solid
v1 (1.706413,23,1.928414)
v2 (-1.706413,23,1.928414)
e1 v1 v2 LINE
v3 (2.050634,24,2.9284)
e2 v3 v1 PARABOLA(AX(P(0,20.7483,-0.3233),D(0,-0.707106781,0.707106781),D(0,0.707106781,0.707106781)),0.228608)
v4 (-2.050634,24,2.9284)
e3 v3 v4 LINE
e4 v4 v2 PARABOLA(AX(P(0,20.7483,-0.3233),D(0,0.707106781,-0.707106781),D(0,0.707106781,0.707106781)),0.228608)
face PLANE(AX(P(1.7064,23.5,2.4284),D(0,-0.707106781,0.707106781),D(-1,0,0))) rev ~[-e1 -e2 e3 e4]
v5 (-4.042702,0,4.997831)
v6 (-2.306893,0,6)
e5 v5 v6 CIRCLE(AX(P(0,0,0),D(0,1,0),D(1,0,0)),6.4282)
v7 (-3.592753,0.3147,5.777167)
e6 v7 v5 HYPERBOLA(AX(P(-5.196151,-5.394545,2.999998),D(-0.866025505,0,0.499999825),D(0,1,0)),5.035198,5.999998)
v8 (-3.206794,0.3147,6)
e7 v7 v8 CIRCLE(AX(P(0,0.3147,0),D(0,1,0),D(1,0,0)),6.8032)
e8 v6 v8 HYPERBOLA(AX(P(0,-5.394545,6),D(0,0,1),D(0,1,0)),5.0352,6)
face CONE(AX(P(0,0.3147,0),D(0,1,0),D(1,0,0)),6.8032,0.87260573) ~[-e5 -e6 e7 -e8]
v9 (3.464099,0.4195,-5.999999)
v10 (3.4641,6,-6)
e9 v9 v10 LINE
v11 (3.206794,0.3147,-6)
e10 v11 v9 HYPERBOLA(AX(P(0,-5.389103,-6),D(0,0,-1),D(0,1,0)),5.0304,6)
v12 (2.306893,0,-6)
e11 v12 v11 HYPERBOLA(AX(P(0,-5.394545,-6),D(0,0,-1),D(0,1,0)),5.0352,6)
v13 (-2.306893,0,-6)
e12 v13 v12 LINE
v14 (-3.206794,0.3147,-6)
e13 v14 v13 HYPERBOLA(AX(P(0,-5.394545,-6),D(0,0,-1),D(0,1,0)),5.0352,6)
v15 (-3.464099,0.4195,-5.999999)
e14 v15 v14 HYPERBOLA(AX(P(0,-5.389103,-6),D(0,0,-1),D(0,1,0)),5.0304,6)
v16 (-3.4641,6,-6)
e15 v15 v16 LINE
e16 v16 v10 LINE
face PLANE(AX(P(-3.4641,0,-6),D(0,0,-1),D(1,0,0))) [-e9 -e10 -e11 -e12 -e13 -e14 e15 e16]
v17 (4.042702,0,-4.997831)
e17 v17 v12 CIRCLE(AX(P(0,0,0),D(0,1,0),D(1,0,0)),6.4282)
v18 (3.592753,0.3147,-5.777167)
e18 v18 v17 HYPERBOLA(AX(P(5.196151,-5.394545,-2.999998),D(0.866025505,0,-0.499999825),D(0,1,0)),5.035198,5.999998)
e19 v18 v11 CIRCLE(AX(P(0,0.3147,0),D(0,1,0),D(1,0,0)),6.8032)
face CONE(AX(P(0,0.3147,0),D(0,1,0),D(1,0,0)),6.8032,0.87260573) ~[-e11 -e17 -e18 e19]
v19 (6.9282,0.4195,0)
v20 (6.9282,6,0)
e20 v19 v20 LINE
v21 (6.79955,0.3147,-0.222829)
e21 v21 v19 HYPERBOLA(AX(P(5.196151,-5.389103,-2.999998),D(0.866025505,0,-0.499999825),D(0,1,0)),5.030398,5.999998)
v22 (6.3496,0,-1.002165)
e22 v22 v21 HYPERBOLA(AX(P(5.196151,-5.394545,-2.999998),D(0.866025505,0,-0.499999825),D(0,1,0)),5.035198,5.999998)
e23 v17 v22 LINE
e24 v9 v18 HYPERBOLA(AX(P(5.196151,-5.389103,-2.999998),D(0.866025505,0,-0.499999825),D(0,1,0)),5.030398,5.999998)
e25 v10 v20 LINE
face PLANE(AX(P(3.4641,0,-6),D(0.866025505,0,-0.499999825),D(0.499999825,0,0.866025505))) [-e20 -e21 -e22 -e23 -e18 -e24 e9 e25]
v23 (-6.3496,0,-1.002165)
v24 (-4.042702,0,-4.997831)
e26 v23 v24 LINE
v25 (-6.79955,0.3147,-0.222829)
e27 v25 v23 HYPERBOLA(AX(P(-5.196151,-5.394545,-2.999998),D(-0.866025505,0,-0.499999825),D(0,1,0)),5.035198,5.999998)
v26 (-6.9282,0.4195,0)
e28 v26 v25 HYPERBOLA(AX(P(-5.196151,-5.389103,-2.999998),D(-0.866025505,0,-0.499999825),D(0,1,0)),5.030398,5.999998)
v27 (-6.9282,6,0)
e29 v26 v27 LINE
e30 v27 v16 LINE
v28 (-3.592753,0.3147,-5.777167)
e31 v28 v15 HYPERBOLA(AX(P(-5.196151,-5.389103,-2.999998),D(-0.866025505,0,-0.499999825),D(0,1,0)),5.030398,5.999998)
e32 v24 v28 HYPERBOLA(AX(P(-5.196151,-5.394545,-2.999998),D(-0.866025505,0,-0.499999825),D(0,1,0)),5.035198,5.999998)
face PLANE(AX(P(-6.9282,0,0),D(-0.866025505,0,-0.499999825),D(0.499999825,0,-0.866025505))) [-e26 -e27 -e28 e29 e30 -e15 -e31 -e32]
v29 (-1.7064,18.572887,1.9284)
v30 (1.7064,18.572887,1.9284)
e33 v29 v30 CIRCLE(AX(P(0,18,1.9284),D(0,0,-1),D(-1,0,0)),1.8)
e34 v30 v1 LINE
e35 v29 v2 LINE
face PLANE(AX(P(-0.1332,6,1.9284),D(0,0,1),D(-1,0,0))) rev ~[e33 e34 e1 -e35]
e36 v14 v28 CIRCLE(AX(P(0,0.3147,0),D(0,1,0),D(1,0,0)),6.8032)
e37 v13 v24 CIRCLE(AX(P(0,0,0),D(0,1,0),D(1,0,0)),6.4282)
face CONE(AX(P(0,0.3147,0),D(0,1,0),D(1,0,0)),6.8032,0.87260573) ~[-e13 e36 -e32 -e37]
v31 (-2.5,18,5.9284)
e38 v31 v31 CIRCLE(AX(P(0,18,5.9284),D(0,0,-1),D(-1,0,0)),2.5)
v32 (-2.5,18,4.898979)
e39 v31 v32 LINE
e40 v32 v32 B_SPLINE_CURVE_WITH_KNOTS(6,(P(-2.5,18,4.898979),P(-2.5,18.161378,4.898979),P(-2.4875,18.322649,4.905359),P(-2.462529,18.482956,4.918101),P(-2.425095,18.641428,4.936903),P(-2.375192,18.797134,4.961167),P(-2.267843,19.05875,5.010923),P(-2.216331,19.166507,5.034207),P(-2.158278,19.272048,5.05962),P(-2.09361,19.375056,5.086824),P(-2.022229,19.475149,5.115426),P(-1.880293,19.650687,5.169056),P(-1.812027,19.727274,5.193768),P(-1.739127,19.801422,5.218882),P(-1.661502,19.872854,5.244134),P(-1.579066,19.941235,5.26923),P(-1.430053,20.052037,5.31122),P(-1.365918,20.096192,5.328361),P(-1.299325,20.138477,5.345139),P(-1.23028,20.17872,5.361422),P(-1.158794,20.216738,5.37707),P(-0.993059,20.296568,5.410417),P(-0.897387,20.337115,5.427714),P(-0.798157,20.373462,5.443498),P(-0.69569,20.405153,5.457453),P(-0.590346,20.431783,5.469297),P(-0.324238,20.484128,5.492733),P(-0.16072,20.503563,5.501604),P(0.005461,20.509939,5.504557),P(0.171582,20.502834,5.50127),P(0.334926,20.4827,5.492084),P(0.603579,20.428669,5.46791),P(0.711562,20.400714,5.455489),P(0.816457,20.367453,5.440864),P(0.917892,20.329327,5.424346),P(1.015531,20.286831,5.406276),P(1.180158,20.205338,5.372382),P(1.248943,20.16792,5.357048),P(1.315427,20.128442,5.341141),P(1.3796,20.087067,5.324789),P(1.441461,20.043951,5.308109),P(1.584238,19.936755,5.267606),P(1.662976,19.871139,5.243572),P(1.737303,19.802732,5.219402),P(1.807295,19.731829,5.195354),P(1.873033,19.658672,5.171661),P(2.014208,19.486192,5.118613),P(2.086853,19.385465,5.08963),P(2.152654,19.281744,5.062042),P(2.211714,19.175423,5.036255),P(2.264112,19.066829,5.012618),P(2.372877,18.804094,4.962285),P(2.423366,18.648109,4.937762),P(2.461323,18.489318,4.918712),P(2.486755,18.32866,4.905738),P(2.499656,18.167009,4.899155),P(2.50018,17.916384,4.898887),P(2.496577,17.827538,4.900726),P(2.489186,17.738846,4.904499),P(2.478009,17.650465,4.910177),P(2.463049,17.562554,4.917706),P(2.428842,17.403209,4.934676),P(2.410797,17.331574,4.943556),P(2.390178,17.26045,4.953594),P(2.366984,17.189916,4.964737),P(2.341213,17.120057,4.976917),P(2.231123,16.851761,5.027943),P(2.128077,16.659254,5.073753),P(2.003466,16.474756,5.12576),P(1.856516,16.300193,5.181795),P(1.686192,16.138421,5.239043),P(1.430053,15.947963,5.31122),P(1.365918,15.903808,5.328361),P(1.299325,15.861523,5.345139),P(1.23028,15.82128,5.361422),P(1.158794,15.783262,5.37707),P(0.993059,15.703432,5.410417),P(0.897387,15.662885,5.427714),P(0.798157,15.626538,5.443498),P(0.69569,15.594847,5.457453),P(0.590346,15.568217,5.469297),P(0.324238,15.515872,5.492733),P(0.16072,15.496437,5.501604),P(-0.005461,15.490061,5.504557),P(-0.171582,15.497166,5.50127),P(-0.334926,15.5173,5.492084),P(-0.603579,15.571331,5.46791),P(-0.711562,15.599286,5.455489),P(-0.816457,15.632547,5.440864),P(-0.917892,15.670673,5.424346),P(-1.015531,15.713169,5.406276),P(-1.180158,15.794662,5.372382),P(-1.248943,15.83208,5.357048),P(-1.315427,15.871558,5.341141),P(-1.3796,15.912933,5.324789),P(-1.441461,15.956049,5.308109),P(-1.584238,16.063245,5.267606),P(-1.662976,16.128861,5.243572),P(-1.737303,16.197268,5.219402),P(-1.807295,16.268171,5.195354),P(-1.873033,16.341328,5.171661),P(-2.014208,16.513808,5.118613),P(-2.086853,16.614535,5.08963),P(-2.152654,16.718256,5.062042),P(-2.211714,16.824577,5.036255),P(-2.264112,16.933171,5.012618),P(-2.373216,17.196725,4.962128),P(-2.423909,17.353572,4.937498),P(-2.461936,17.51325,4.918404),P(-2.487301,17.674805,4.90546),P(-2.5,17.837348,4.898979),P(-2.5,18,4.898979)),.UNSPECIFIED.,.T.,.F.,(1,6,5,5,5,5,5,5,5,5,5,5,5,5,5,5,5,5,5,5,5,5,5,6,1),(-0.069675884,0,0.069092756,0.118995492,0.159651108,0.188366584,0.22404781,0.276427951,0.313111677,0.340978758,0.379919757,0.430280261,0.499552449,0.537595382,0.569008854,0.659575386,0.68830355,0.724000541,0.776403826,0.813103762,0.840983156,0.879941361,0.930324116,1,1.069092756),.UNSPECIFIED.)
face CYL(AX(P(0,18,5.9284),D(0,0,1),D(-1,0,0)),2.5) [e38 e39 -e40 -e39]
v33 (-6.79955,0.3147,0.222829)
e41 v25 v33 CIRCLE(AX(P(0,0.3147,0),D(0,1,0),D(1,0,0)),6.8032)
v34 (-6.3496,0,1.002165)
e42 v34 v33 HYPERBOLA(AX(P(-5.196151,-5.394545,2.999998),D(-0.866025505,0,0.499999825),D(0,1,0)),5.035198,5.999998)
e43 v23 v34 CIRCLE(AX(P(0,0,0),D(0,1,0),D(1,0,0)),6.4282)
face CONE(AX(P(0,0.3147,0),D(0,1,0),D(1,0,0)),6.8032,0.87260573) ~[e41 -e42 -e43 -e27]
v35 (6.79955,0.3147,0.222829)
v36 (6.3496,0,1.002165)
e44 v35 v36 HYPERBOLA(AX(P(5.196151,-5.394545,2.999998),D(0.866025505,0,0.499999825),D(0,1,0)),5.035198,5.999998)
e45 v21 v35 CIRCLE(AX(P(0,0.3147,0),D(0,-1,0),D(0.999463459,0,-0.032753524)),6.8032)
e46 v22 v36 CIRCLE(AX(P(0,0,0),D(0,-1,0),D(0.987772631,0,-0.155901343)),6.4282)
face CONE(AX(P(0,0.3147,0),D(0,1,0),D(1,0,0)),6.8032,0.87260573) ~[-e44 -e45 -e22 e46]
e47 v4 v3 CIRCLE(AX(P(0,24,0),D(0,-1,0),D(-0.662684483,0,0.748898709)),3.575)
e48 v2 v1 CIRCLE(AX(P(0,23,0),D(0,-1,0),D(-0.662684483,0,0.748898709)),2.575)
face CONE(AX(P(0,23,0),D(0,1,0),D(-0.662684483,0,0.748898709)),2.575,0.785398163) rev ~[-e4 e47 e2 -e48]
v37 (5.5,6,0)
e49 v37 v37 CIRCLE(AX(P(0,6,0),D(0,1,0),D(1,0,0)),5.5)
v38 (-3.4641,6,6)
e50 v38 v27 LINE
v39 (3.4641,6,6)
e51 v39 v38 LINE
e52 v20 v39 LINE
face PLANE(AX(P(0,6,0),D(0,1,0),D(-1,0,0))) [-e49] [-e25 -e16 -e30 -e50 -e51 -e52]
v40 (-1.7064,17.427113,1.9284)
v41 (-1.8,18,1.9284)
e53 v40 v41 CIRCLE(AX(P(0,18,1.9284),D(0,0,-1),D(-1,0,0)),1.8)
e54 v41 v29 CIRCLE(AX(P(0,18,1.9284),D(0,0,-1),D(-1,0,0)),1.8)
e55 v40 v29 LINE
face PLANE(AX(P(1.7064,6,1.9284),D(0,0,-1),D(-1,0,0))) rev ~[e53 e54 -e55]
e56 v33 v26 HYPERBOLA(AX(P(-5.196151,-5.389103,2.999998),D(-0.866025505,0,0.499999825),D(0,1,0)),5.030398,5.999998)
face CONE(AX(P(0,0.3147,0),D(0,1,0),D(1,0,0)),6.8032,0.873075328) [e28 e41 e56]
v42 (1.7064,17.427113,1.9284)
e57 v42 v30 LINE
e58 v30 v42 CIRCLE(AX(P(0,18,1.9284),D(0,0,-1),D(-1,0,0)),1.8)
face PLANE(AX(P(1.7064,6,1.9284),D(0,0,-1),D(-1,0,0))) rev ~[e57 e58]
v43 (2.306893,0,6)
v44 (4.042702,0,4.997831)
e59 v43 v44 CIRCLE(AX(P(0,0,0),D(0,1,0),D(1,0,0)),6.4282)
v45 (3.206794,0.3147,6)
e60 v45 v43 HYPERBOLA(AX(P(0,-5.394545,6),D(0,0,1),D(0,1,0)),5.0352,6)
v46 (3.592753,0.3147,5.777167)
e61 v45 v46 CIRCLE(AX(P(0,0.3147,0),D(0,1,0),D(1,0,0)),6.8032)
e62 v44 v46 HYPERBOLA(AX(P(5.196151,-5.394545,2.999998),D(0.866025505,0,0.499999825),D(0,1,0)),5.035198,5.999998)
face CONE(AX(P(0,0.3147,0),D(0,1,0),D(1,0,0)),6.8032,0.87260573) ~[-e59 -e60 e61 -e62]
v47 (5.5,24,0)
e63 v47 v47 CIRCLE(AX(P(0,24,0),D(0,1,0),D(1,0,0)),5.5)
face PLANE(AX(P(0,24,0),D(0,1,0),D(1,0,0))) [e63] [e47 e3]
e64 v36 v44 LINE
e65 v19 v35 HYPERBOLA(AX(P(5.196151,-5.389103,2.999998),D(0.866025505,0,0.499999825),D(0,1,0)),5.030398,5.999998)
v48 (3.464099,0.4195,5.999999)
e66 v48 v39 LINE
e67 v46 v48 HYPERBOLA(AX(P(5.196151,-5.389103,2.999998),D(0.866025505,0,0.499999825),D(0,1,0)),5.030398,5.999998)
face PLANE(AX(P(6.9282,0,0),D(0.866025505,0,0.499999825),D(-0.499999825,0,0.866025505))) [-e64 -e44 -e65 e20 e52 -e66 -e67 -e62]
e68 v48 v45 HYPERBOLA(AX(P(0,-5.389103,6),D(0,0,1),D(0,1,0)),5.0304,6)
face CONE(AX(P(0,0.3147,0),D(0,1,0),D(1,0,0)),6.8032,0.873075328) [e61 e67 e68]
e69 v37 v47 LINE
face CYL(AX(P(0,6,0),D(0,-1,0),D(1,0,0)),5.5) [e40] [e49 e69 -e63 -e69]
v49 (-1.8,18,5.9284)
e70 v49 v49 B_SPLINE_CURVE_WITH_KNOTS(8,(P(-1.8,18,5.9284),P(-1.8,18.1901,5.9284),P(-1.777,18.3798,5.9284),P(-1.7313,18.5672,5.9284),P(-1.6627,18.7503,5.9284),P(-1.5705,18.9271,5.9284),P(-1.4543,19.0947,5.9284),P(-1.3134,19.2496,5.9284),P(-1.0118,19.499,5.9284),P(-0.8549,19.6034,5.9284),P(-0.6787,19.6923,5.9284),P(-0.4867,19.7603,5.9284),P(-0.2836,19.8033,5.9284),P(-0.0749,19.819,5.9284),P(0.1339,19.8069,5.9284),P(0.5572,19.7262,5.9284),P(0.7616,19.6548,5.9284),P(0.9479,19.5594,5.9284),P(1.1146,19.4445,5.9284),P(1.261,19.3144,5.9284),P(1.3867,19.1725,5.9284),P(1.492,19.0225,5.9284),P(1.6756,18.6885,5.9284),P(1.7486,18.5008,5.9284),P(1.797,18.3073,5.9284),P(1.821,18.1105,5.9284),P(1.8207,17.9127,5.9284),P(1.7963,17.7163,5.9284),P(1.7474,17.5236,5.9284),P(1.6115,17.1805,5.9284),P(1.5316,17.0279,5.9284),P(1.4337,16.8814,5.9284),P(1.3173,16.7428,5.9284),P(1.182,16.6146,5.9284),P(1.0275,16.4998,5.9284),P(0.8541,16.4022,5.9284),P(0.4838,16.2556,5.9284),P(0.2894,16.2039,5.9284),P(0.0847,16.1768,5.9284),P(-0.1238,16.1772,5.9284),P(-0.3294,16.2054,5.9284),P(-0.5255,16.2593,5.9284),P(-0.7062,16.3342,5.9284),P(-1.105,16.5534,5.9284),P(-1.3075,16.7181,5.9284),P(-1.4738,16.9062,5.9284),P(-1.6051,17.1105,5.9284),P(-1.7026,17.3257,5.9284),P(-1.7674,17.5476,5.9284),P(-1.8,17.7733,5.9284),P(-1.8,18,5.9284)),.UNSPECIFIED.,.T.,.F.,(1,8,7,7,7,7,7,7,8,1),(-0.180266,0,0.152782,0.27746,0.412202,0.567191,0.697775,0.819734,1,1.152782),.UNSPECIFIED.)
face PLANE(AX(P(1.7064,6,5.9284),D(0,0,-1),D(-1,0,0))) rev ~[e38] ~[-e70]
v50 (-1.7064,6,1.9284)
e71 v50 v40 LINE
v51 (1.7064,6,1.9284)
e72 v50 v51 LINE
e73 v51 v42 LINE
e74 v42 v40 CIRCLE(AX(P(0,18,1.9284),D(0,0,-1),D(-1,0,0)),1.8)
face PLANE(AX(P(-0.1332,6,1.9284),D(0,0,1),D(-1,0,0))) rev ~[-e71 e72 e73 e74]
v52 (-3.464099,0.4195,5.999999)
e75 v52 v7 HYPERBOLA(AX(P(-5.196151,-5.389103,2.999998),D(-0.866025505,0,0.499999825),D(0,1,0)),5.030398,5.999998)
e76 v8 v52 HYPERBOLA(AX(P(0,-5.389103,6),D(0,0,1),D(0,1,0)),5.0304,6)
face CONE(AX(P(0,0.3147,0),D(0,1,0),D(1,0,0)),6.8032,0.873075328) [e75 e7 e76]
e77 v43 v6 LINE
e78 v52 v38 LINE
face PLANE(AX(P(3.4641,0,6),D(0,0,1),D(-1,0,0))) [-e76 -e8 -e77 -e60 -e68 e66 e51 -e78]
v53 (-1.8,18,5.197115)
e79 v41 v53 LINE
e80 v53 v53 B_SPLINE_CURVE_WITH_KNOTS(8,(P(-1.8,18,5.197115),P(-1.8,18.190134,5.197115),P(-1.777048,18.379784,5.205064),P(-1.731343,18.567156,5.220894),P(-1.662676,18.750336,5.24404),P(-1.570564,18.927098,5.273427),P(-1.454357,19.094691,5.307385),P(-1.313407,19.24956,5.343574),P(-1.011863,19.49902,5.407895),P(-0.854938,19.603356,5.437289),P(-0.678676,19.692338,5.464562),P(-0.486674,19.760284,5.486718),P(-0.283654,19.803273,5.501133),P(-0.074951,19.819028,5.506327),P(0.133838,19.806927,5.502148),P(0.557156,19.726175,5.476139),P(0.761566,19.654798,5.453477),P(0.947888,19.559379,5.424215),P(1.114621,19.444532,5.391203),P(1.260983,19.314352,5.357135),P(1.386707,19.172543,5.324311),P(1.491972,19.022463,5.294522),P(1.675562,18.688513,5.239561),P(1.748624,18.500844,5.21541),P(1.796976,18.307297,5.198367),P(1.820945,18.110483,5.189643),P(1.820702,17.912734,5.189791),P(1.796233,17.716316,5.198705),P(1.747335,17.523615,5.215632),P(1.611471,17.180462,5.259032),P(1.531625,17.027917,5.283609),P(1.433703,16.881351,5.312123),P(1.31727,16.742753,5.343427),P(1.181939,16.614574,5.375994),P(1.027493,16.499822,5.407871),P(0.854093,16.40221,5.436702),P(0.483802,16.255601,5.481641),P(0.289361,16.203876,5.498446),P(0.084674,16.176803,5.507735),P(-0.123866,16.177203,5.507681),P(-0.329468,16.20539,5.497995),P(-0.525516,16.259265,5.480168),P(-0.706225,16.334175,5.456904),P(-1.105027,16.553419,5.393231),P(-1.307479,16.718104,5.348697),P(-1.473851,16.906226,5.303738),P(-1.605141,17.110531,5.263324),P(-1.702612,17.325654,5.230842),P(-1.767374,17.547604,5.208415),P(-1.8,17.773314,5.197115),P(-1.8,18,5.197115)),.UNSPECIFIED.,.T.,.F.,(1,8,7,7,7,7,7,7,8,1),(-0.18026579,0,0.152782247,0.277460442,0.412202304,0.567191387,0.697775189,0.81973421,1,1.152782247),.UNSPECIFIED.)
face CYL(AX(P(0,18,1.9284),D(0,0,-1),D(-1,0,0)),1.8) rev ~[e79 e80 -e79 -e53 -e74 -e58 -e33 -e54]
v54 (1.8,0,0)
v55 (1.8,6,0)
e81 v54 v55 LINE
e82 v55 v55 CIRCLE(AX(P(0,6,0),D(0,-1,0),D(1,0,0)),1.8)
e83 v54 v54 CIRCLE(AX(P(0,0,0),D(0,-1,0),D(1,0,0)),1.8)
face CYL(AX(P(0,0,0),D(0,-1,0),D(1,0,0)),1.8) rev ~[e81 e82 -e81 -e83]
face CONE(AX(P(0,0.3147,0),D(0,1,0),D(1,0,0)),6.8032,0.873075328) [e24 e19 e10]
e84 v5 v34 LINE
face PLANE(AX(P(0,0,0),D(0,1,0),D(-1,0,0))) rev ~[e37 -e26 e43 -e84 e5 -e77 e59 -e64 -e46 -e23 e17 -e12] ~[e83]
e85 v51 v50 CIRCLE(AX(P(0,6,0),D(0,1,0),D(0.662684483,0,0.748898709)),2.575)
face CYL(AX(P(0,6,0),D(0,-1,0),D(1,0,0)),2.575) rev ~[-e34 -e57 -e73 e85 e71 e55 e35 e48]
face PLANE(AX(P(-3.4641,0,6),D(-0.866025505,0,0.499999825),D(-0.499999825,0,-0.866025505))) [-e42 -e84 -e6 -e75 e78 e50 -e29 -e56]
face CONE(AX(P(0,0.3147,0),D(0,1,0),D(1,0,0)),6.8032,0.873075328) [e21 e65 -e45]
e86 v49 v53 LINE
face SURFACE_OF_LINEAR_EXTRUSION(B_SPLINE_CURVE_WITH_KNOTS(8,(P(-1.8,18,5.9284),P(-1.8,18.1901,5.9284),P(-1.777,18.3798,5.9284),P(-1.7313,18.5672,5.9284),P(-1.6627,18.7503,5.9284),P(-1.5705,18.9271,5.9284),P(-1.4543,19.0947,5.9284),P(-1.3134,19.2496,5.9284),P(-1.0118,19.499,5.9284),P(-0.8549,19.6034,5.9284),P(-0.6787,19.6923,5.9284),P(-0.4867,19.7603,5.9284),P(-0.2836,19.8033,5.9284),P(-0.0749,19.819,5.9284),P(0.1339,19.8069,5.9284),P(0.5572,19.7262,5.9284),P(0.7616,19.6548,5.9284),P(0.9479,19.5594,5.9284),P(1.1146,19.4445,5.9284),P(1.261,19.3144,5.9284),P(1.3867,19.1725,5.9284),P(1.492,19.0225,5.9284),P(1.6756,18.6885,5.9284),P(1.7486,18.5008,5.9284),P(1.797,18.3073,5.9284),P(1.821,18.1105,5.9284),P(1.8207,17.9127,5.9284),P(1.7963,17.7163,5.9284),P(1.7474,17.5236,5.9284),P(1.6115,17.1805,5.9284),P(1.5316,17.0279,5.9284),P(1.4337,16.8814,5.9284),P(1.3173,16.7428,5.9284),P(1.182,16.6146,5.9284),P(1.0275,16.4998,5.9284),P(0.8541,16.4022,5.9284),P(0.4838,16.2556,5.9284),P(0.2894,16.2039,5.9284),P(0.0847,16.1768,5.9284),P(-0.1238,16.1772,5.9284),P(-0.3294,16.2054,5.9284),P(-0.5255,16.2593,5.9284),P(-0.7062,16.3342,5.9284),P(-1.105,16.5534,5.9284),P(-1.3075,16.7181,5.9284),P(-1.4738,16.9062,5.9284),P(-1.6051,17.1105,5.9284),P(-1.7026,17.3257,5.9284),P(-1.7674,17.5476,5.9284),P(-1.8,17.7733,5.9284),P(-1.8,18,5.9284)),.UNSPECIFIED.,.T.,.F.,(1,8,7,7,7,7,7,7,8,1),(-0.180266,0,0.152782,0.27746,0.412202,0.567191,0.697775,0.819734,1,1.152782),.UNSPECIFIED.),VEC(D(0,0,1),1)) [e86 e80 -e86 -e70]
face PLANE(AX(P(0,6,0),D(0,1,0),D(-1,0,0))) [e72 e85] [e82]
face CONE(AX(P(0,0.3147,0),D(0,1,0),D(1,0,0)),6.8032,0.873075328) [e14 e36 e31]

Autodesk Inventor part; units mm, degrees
ref_plane "YZ Plane" through (0, 0, 0) normal (1, 0, 0) x (0, 1, 0)
ref_plane "XZ Plane" through (0, 0, 0) normal (0, 1, 0) x (-1, 0, 0)
sketch "Sketch7" plane through (0, 0, 0) normal (0, 1, 0) x (-1, 0, 0)
  line L0 (-3.4641, -6) -> (-6.9282, 0)
  line L1 (-6.9282, 0) -> (-3.4641, 6)
  line L2 (-3.4641, 6) -> (3.4641, 6)
  line L3 (3.4641, 6) -> (6.9282, 0)
  line L4 (6.9282, 0) -> (3.4641, -6)
  line L5 (3.4641, -6) -> (-3.4641, -6)
  point P0 (0, 0)
  point P1 (0, 0)
  point P2 (0, -6)
  dimension "d24" = 12
extrude "Extrusion6" add sketch "Sketch7" along normal blind 6
sketch "Sketch8" plane through (0, 6, 0) normal (0, 1, 0) x (1, 0, 0)
  circle A0 centre (0, 0) radius 5.5
  circle A1 centre (0, 0) radius 2.575
  line L0 (-0.1332, 2.5716) -> (-0.1332, -1.9284)
  line L1 (-0.1332, -1.9284) -> (-1.7064, -1.9284)
  line L2 (-0.1332, -1.9284) -> (1.7064, -1.9284)
  dimension "d27" = 11
  dimension "d28" = 5.15
  dimension "d29" = 4.5
  dimension "d30" = 1.5732
extrude "Extrusion7" add sketch "Sketch8" along normal blind 18 contours A0 | A1 L1 L2
sketch "Sketch9" plane through (0, 0, 0) normal (0, 0, 1) x (1, 0, 0)
  line L0 (6.9282, 0) -> (3.4641, 0) projected
  line L1 (6.9282, 0) -> (6.4282, 0)
  line L2 (6.8032, 0.3147) -> (6.4282, 0)
  line L3 (6.9282, 0) -> (6.9282, 0.3868)
  line L4 (0, -4.8) -> (0, 28.8) projected
  line L5 (6.8032, 0.3147) -> (6.9282, 0.4195)
  line L6 (6.9282, 0.4195) -> (6.9282, 0.3868)
  point P0 (0, 0)
  dimension "d33" = 0.5
  dimension "d35" = 40
  dimension "d39" = 0.125
  dimension "d40" = 0.1049
revolve "Revolution1" cut sketch "Sketch9" angle 360 about axis through (0, -10, 0) along (0, 1, 0)
chamfer "Chamfer3" distance 1 angle 45 2 edges at (0, 24, -2.575) (0, 24, 1.9284)
sketch "Sketch10" plane through (0, 0, 0) normal (0, -1, 0) x (1, 0, 0)
  circle A0 centre (0, 0) radius 1.8
  dimension "d44" = 3.6
extrude "Extrusion8" cut sketch "Sketch10" against normal through all
sketch "Sketch13" plane through (1.7064, 6, 1.9284) normal (0, 0, -1) x (-1, 0, 0)
  circle A0 centre (1.7064, 12) radius 1.8
  point P0 (1.7064, -6)
  dimension "d55" = 3.6
  dimension "d56" = 18
  dimension "d57" = 0
extrude "Extrusion11" cut sketch "Sketch13" against normal through all
ref_plane "Work Plane2" through (1.7064, 6, 5.9284) normal (0, 0, -1) x (-1, 0, 0)
sketch "Sketch14" plane through (1.7064, 6, 5.9284) normal (0, 0, -1) x (-1, 0, 0)
  spline S0 degree 8 poles (3.5064, 12) (3.5064, 12.1901) (3.4834, 12.3798) (3.4377, 12.5672) (3.3691, 12.7503) (3.2769, 12.9271) (3.1607, 13.0947) (3.0198, 13.2496) (2.7182, 13.499) (2.5613, 13.6034) (2.3851, 13.6923) (2.1931, 13.7603) (1.99, 13.8033) (1.7813, 13.819) (1.5725, 13.8069) (1.1492, 13.7262) (0.9448, 13.6548) (0.7585, 13.5594) (0.5918, 13.4445) (0.4454, 13.3144) (0.3197, 13.1725) (0.2144, 13.0225) (0.0308, 12.6885) (-0.0422, 12.5008) (-0.0906, 12.3073) (-0.1146, 12.1105) (-0.1143, 11.9127) (-0.0899, 11.7163) (-0.041, 11.5236) (0.0949, 11.1805) (0.1748, 11.0279) (0.2727, 10.8814) (0.3891, 10.7428) (0.5244, 10.6146) (0.6789, 10.4998) (0.8523, 10.4022) (1.2226, 10.2556) (1.417, 10.2039) (1.6217, 10.1768) (1.8302, 10.1772) (2.0358, 10.2054) (2.2319, 10.2593) (2.4126, 10.3342) (2.8114, 10.5534) (3.0139, 10.7181) (3.1802, 10.9062) (3.3115, 11.1105) (3.409, 11.3257) (3.4738, 11.5476) (3.5064, 11.7733) (3.5064, 12) knots 0 0 0 0 0 0 0 0 0 0.152782 0.152782 0.152782 0.152782 0.152782 0.152782 0.152782 0.27746 0.27746 0.27746 0.27746 0.27746 0.27746 0.27746 0.412202 0.412202 0.412202 0.412202 0.412202 0.412202 0.412202 0.567191 0.567191 0.567191 0.567191 0.567191 0.567191 0.567191 0.697775 0.697775 0.697775 0.697775 0.697775 0.697775 0.697775 0.819734 0.819734 0.819734 0.819734 0.819734 0.819734 0.819734 1 1 1 1 1 1 1 1 1 projected
  circle A0 centre (1.7064, 12) radius 2.5
  line L0 (4.0133, -6) -> (-0.6005, -6) projected
  point P0 (1.7064, -6)
  point P1 (1.7064, -6)
  point P2 (1.7064, -6)
  dimension "d61" = 5
  dimension "d62" = 18
extrude "Extrusion12" add sketch "Sketch14" along normal up to surface
properties part number "PIN_3DPrint"
